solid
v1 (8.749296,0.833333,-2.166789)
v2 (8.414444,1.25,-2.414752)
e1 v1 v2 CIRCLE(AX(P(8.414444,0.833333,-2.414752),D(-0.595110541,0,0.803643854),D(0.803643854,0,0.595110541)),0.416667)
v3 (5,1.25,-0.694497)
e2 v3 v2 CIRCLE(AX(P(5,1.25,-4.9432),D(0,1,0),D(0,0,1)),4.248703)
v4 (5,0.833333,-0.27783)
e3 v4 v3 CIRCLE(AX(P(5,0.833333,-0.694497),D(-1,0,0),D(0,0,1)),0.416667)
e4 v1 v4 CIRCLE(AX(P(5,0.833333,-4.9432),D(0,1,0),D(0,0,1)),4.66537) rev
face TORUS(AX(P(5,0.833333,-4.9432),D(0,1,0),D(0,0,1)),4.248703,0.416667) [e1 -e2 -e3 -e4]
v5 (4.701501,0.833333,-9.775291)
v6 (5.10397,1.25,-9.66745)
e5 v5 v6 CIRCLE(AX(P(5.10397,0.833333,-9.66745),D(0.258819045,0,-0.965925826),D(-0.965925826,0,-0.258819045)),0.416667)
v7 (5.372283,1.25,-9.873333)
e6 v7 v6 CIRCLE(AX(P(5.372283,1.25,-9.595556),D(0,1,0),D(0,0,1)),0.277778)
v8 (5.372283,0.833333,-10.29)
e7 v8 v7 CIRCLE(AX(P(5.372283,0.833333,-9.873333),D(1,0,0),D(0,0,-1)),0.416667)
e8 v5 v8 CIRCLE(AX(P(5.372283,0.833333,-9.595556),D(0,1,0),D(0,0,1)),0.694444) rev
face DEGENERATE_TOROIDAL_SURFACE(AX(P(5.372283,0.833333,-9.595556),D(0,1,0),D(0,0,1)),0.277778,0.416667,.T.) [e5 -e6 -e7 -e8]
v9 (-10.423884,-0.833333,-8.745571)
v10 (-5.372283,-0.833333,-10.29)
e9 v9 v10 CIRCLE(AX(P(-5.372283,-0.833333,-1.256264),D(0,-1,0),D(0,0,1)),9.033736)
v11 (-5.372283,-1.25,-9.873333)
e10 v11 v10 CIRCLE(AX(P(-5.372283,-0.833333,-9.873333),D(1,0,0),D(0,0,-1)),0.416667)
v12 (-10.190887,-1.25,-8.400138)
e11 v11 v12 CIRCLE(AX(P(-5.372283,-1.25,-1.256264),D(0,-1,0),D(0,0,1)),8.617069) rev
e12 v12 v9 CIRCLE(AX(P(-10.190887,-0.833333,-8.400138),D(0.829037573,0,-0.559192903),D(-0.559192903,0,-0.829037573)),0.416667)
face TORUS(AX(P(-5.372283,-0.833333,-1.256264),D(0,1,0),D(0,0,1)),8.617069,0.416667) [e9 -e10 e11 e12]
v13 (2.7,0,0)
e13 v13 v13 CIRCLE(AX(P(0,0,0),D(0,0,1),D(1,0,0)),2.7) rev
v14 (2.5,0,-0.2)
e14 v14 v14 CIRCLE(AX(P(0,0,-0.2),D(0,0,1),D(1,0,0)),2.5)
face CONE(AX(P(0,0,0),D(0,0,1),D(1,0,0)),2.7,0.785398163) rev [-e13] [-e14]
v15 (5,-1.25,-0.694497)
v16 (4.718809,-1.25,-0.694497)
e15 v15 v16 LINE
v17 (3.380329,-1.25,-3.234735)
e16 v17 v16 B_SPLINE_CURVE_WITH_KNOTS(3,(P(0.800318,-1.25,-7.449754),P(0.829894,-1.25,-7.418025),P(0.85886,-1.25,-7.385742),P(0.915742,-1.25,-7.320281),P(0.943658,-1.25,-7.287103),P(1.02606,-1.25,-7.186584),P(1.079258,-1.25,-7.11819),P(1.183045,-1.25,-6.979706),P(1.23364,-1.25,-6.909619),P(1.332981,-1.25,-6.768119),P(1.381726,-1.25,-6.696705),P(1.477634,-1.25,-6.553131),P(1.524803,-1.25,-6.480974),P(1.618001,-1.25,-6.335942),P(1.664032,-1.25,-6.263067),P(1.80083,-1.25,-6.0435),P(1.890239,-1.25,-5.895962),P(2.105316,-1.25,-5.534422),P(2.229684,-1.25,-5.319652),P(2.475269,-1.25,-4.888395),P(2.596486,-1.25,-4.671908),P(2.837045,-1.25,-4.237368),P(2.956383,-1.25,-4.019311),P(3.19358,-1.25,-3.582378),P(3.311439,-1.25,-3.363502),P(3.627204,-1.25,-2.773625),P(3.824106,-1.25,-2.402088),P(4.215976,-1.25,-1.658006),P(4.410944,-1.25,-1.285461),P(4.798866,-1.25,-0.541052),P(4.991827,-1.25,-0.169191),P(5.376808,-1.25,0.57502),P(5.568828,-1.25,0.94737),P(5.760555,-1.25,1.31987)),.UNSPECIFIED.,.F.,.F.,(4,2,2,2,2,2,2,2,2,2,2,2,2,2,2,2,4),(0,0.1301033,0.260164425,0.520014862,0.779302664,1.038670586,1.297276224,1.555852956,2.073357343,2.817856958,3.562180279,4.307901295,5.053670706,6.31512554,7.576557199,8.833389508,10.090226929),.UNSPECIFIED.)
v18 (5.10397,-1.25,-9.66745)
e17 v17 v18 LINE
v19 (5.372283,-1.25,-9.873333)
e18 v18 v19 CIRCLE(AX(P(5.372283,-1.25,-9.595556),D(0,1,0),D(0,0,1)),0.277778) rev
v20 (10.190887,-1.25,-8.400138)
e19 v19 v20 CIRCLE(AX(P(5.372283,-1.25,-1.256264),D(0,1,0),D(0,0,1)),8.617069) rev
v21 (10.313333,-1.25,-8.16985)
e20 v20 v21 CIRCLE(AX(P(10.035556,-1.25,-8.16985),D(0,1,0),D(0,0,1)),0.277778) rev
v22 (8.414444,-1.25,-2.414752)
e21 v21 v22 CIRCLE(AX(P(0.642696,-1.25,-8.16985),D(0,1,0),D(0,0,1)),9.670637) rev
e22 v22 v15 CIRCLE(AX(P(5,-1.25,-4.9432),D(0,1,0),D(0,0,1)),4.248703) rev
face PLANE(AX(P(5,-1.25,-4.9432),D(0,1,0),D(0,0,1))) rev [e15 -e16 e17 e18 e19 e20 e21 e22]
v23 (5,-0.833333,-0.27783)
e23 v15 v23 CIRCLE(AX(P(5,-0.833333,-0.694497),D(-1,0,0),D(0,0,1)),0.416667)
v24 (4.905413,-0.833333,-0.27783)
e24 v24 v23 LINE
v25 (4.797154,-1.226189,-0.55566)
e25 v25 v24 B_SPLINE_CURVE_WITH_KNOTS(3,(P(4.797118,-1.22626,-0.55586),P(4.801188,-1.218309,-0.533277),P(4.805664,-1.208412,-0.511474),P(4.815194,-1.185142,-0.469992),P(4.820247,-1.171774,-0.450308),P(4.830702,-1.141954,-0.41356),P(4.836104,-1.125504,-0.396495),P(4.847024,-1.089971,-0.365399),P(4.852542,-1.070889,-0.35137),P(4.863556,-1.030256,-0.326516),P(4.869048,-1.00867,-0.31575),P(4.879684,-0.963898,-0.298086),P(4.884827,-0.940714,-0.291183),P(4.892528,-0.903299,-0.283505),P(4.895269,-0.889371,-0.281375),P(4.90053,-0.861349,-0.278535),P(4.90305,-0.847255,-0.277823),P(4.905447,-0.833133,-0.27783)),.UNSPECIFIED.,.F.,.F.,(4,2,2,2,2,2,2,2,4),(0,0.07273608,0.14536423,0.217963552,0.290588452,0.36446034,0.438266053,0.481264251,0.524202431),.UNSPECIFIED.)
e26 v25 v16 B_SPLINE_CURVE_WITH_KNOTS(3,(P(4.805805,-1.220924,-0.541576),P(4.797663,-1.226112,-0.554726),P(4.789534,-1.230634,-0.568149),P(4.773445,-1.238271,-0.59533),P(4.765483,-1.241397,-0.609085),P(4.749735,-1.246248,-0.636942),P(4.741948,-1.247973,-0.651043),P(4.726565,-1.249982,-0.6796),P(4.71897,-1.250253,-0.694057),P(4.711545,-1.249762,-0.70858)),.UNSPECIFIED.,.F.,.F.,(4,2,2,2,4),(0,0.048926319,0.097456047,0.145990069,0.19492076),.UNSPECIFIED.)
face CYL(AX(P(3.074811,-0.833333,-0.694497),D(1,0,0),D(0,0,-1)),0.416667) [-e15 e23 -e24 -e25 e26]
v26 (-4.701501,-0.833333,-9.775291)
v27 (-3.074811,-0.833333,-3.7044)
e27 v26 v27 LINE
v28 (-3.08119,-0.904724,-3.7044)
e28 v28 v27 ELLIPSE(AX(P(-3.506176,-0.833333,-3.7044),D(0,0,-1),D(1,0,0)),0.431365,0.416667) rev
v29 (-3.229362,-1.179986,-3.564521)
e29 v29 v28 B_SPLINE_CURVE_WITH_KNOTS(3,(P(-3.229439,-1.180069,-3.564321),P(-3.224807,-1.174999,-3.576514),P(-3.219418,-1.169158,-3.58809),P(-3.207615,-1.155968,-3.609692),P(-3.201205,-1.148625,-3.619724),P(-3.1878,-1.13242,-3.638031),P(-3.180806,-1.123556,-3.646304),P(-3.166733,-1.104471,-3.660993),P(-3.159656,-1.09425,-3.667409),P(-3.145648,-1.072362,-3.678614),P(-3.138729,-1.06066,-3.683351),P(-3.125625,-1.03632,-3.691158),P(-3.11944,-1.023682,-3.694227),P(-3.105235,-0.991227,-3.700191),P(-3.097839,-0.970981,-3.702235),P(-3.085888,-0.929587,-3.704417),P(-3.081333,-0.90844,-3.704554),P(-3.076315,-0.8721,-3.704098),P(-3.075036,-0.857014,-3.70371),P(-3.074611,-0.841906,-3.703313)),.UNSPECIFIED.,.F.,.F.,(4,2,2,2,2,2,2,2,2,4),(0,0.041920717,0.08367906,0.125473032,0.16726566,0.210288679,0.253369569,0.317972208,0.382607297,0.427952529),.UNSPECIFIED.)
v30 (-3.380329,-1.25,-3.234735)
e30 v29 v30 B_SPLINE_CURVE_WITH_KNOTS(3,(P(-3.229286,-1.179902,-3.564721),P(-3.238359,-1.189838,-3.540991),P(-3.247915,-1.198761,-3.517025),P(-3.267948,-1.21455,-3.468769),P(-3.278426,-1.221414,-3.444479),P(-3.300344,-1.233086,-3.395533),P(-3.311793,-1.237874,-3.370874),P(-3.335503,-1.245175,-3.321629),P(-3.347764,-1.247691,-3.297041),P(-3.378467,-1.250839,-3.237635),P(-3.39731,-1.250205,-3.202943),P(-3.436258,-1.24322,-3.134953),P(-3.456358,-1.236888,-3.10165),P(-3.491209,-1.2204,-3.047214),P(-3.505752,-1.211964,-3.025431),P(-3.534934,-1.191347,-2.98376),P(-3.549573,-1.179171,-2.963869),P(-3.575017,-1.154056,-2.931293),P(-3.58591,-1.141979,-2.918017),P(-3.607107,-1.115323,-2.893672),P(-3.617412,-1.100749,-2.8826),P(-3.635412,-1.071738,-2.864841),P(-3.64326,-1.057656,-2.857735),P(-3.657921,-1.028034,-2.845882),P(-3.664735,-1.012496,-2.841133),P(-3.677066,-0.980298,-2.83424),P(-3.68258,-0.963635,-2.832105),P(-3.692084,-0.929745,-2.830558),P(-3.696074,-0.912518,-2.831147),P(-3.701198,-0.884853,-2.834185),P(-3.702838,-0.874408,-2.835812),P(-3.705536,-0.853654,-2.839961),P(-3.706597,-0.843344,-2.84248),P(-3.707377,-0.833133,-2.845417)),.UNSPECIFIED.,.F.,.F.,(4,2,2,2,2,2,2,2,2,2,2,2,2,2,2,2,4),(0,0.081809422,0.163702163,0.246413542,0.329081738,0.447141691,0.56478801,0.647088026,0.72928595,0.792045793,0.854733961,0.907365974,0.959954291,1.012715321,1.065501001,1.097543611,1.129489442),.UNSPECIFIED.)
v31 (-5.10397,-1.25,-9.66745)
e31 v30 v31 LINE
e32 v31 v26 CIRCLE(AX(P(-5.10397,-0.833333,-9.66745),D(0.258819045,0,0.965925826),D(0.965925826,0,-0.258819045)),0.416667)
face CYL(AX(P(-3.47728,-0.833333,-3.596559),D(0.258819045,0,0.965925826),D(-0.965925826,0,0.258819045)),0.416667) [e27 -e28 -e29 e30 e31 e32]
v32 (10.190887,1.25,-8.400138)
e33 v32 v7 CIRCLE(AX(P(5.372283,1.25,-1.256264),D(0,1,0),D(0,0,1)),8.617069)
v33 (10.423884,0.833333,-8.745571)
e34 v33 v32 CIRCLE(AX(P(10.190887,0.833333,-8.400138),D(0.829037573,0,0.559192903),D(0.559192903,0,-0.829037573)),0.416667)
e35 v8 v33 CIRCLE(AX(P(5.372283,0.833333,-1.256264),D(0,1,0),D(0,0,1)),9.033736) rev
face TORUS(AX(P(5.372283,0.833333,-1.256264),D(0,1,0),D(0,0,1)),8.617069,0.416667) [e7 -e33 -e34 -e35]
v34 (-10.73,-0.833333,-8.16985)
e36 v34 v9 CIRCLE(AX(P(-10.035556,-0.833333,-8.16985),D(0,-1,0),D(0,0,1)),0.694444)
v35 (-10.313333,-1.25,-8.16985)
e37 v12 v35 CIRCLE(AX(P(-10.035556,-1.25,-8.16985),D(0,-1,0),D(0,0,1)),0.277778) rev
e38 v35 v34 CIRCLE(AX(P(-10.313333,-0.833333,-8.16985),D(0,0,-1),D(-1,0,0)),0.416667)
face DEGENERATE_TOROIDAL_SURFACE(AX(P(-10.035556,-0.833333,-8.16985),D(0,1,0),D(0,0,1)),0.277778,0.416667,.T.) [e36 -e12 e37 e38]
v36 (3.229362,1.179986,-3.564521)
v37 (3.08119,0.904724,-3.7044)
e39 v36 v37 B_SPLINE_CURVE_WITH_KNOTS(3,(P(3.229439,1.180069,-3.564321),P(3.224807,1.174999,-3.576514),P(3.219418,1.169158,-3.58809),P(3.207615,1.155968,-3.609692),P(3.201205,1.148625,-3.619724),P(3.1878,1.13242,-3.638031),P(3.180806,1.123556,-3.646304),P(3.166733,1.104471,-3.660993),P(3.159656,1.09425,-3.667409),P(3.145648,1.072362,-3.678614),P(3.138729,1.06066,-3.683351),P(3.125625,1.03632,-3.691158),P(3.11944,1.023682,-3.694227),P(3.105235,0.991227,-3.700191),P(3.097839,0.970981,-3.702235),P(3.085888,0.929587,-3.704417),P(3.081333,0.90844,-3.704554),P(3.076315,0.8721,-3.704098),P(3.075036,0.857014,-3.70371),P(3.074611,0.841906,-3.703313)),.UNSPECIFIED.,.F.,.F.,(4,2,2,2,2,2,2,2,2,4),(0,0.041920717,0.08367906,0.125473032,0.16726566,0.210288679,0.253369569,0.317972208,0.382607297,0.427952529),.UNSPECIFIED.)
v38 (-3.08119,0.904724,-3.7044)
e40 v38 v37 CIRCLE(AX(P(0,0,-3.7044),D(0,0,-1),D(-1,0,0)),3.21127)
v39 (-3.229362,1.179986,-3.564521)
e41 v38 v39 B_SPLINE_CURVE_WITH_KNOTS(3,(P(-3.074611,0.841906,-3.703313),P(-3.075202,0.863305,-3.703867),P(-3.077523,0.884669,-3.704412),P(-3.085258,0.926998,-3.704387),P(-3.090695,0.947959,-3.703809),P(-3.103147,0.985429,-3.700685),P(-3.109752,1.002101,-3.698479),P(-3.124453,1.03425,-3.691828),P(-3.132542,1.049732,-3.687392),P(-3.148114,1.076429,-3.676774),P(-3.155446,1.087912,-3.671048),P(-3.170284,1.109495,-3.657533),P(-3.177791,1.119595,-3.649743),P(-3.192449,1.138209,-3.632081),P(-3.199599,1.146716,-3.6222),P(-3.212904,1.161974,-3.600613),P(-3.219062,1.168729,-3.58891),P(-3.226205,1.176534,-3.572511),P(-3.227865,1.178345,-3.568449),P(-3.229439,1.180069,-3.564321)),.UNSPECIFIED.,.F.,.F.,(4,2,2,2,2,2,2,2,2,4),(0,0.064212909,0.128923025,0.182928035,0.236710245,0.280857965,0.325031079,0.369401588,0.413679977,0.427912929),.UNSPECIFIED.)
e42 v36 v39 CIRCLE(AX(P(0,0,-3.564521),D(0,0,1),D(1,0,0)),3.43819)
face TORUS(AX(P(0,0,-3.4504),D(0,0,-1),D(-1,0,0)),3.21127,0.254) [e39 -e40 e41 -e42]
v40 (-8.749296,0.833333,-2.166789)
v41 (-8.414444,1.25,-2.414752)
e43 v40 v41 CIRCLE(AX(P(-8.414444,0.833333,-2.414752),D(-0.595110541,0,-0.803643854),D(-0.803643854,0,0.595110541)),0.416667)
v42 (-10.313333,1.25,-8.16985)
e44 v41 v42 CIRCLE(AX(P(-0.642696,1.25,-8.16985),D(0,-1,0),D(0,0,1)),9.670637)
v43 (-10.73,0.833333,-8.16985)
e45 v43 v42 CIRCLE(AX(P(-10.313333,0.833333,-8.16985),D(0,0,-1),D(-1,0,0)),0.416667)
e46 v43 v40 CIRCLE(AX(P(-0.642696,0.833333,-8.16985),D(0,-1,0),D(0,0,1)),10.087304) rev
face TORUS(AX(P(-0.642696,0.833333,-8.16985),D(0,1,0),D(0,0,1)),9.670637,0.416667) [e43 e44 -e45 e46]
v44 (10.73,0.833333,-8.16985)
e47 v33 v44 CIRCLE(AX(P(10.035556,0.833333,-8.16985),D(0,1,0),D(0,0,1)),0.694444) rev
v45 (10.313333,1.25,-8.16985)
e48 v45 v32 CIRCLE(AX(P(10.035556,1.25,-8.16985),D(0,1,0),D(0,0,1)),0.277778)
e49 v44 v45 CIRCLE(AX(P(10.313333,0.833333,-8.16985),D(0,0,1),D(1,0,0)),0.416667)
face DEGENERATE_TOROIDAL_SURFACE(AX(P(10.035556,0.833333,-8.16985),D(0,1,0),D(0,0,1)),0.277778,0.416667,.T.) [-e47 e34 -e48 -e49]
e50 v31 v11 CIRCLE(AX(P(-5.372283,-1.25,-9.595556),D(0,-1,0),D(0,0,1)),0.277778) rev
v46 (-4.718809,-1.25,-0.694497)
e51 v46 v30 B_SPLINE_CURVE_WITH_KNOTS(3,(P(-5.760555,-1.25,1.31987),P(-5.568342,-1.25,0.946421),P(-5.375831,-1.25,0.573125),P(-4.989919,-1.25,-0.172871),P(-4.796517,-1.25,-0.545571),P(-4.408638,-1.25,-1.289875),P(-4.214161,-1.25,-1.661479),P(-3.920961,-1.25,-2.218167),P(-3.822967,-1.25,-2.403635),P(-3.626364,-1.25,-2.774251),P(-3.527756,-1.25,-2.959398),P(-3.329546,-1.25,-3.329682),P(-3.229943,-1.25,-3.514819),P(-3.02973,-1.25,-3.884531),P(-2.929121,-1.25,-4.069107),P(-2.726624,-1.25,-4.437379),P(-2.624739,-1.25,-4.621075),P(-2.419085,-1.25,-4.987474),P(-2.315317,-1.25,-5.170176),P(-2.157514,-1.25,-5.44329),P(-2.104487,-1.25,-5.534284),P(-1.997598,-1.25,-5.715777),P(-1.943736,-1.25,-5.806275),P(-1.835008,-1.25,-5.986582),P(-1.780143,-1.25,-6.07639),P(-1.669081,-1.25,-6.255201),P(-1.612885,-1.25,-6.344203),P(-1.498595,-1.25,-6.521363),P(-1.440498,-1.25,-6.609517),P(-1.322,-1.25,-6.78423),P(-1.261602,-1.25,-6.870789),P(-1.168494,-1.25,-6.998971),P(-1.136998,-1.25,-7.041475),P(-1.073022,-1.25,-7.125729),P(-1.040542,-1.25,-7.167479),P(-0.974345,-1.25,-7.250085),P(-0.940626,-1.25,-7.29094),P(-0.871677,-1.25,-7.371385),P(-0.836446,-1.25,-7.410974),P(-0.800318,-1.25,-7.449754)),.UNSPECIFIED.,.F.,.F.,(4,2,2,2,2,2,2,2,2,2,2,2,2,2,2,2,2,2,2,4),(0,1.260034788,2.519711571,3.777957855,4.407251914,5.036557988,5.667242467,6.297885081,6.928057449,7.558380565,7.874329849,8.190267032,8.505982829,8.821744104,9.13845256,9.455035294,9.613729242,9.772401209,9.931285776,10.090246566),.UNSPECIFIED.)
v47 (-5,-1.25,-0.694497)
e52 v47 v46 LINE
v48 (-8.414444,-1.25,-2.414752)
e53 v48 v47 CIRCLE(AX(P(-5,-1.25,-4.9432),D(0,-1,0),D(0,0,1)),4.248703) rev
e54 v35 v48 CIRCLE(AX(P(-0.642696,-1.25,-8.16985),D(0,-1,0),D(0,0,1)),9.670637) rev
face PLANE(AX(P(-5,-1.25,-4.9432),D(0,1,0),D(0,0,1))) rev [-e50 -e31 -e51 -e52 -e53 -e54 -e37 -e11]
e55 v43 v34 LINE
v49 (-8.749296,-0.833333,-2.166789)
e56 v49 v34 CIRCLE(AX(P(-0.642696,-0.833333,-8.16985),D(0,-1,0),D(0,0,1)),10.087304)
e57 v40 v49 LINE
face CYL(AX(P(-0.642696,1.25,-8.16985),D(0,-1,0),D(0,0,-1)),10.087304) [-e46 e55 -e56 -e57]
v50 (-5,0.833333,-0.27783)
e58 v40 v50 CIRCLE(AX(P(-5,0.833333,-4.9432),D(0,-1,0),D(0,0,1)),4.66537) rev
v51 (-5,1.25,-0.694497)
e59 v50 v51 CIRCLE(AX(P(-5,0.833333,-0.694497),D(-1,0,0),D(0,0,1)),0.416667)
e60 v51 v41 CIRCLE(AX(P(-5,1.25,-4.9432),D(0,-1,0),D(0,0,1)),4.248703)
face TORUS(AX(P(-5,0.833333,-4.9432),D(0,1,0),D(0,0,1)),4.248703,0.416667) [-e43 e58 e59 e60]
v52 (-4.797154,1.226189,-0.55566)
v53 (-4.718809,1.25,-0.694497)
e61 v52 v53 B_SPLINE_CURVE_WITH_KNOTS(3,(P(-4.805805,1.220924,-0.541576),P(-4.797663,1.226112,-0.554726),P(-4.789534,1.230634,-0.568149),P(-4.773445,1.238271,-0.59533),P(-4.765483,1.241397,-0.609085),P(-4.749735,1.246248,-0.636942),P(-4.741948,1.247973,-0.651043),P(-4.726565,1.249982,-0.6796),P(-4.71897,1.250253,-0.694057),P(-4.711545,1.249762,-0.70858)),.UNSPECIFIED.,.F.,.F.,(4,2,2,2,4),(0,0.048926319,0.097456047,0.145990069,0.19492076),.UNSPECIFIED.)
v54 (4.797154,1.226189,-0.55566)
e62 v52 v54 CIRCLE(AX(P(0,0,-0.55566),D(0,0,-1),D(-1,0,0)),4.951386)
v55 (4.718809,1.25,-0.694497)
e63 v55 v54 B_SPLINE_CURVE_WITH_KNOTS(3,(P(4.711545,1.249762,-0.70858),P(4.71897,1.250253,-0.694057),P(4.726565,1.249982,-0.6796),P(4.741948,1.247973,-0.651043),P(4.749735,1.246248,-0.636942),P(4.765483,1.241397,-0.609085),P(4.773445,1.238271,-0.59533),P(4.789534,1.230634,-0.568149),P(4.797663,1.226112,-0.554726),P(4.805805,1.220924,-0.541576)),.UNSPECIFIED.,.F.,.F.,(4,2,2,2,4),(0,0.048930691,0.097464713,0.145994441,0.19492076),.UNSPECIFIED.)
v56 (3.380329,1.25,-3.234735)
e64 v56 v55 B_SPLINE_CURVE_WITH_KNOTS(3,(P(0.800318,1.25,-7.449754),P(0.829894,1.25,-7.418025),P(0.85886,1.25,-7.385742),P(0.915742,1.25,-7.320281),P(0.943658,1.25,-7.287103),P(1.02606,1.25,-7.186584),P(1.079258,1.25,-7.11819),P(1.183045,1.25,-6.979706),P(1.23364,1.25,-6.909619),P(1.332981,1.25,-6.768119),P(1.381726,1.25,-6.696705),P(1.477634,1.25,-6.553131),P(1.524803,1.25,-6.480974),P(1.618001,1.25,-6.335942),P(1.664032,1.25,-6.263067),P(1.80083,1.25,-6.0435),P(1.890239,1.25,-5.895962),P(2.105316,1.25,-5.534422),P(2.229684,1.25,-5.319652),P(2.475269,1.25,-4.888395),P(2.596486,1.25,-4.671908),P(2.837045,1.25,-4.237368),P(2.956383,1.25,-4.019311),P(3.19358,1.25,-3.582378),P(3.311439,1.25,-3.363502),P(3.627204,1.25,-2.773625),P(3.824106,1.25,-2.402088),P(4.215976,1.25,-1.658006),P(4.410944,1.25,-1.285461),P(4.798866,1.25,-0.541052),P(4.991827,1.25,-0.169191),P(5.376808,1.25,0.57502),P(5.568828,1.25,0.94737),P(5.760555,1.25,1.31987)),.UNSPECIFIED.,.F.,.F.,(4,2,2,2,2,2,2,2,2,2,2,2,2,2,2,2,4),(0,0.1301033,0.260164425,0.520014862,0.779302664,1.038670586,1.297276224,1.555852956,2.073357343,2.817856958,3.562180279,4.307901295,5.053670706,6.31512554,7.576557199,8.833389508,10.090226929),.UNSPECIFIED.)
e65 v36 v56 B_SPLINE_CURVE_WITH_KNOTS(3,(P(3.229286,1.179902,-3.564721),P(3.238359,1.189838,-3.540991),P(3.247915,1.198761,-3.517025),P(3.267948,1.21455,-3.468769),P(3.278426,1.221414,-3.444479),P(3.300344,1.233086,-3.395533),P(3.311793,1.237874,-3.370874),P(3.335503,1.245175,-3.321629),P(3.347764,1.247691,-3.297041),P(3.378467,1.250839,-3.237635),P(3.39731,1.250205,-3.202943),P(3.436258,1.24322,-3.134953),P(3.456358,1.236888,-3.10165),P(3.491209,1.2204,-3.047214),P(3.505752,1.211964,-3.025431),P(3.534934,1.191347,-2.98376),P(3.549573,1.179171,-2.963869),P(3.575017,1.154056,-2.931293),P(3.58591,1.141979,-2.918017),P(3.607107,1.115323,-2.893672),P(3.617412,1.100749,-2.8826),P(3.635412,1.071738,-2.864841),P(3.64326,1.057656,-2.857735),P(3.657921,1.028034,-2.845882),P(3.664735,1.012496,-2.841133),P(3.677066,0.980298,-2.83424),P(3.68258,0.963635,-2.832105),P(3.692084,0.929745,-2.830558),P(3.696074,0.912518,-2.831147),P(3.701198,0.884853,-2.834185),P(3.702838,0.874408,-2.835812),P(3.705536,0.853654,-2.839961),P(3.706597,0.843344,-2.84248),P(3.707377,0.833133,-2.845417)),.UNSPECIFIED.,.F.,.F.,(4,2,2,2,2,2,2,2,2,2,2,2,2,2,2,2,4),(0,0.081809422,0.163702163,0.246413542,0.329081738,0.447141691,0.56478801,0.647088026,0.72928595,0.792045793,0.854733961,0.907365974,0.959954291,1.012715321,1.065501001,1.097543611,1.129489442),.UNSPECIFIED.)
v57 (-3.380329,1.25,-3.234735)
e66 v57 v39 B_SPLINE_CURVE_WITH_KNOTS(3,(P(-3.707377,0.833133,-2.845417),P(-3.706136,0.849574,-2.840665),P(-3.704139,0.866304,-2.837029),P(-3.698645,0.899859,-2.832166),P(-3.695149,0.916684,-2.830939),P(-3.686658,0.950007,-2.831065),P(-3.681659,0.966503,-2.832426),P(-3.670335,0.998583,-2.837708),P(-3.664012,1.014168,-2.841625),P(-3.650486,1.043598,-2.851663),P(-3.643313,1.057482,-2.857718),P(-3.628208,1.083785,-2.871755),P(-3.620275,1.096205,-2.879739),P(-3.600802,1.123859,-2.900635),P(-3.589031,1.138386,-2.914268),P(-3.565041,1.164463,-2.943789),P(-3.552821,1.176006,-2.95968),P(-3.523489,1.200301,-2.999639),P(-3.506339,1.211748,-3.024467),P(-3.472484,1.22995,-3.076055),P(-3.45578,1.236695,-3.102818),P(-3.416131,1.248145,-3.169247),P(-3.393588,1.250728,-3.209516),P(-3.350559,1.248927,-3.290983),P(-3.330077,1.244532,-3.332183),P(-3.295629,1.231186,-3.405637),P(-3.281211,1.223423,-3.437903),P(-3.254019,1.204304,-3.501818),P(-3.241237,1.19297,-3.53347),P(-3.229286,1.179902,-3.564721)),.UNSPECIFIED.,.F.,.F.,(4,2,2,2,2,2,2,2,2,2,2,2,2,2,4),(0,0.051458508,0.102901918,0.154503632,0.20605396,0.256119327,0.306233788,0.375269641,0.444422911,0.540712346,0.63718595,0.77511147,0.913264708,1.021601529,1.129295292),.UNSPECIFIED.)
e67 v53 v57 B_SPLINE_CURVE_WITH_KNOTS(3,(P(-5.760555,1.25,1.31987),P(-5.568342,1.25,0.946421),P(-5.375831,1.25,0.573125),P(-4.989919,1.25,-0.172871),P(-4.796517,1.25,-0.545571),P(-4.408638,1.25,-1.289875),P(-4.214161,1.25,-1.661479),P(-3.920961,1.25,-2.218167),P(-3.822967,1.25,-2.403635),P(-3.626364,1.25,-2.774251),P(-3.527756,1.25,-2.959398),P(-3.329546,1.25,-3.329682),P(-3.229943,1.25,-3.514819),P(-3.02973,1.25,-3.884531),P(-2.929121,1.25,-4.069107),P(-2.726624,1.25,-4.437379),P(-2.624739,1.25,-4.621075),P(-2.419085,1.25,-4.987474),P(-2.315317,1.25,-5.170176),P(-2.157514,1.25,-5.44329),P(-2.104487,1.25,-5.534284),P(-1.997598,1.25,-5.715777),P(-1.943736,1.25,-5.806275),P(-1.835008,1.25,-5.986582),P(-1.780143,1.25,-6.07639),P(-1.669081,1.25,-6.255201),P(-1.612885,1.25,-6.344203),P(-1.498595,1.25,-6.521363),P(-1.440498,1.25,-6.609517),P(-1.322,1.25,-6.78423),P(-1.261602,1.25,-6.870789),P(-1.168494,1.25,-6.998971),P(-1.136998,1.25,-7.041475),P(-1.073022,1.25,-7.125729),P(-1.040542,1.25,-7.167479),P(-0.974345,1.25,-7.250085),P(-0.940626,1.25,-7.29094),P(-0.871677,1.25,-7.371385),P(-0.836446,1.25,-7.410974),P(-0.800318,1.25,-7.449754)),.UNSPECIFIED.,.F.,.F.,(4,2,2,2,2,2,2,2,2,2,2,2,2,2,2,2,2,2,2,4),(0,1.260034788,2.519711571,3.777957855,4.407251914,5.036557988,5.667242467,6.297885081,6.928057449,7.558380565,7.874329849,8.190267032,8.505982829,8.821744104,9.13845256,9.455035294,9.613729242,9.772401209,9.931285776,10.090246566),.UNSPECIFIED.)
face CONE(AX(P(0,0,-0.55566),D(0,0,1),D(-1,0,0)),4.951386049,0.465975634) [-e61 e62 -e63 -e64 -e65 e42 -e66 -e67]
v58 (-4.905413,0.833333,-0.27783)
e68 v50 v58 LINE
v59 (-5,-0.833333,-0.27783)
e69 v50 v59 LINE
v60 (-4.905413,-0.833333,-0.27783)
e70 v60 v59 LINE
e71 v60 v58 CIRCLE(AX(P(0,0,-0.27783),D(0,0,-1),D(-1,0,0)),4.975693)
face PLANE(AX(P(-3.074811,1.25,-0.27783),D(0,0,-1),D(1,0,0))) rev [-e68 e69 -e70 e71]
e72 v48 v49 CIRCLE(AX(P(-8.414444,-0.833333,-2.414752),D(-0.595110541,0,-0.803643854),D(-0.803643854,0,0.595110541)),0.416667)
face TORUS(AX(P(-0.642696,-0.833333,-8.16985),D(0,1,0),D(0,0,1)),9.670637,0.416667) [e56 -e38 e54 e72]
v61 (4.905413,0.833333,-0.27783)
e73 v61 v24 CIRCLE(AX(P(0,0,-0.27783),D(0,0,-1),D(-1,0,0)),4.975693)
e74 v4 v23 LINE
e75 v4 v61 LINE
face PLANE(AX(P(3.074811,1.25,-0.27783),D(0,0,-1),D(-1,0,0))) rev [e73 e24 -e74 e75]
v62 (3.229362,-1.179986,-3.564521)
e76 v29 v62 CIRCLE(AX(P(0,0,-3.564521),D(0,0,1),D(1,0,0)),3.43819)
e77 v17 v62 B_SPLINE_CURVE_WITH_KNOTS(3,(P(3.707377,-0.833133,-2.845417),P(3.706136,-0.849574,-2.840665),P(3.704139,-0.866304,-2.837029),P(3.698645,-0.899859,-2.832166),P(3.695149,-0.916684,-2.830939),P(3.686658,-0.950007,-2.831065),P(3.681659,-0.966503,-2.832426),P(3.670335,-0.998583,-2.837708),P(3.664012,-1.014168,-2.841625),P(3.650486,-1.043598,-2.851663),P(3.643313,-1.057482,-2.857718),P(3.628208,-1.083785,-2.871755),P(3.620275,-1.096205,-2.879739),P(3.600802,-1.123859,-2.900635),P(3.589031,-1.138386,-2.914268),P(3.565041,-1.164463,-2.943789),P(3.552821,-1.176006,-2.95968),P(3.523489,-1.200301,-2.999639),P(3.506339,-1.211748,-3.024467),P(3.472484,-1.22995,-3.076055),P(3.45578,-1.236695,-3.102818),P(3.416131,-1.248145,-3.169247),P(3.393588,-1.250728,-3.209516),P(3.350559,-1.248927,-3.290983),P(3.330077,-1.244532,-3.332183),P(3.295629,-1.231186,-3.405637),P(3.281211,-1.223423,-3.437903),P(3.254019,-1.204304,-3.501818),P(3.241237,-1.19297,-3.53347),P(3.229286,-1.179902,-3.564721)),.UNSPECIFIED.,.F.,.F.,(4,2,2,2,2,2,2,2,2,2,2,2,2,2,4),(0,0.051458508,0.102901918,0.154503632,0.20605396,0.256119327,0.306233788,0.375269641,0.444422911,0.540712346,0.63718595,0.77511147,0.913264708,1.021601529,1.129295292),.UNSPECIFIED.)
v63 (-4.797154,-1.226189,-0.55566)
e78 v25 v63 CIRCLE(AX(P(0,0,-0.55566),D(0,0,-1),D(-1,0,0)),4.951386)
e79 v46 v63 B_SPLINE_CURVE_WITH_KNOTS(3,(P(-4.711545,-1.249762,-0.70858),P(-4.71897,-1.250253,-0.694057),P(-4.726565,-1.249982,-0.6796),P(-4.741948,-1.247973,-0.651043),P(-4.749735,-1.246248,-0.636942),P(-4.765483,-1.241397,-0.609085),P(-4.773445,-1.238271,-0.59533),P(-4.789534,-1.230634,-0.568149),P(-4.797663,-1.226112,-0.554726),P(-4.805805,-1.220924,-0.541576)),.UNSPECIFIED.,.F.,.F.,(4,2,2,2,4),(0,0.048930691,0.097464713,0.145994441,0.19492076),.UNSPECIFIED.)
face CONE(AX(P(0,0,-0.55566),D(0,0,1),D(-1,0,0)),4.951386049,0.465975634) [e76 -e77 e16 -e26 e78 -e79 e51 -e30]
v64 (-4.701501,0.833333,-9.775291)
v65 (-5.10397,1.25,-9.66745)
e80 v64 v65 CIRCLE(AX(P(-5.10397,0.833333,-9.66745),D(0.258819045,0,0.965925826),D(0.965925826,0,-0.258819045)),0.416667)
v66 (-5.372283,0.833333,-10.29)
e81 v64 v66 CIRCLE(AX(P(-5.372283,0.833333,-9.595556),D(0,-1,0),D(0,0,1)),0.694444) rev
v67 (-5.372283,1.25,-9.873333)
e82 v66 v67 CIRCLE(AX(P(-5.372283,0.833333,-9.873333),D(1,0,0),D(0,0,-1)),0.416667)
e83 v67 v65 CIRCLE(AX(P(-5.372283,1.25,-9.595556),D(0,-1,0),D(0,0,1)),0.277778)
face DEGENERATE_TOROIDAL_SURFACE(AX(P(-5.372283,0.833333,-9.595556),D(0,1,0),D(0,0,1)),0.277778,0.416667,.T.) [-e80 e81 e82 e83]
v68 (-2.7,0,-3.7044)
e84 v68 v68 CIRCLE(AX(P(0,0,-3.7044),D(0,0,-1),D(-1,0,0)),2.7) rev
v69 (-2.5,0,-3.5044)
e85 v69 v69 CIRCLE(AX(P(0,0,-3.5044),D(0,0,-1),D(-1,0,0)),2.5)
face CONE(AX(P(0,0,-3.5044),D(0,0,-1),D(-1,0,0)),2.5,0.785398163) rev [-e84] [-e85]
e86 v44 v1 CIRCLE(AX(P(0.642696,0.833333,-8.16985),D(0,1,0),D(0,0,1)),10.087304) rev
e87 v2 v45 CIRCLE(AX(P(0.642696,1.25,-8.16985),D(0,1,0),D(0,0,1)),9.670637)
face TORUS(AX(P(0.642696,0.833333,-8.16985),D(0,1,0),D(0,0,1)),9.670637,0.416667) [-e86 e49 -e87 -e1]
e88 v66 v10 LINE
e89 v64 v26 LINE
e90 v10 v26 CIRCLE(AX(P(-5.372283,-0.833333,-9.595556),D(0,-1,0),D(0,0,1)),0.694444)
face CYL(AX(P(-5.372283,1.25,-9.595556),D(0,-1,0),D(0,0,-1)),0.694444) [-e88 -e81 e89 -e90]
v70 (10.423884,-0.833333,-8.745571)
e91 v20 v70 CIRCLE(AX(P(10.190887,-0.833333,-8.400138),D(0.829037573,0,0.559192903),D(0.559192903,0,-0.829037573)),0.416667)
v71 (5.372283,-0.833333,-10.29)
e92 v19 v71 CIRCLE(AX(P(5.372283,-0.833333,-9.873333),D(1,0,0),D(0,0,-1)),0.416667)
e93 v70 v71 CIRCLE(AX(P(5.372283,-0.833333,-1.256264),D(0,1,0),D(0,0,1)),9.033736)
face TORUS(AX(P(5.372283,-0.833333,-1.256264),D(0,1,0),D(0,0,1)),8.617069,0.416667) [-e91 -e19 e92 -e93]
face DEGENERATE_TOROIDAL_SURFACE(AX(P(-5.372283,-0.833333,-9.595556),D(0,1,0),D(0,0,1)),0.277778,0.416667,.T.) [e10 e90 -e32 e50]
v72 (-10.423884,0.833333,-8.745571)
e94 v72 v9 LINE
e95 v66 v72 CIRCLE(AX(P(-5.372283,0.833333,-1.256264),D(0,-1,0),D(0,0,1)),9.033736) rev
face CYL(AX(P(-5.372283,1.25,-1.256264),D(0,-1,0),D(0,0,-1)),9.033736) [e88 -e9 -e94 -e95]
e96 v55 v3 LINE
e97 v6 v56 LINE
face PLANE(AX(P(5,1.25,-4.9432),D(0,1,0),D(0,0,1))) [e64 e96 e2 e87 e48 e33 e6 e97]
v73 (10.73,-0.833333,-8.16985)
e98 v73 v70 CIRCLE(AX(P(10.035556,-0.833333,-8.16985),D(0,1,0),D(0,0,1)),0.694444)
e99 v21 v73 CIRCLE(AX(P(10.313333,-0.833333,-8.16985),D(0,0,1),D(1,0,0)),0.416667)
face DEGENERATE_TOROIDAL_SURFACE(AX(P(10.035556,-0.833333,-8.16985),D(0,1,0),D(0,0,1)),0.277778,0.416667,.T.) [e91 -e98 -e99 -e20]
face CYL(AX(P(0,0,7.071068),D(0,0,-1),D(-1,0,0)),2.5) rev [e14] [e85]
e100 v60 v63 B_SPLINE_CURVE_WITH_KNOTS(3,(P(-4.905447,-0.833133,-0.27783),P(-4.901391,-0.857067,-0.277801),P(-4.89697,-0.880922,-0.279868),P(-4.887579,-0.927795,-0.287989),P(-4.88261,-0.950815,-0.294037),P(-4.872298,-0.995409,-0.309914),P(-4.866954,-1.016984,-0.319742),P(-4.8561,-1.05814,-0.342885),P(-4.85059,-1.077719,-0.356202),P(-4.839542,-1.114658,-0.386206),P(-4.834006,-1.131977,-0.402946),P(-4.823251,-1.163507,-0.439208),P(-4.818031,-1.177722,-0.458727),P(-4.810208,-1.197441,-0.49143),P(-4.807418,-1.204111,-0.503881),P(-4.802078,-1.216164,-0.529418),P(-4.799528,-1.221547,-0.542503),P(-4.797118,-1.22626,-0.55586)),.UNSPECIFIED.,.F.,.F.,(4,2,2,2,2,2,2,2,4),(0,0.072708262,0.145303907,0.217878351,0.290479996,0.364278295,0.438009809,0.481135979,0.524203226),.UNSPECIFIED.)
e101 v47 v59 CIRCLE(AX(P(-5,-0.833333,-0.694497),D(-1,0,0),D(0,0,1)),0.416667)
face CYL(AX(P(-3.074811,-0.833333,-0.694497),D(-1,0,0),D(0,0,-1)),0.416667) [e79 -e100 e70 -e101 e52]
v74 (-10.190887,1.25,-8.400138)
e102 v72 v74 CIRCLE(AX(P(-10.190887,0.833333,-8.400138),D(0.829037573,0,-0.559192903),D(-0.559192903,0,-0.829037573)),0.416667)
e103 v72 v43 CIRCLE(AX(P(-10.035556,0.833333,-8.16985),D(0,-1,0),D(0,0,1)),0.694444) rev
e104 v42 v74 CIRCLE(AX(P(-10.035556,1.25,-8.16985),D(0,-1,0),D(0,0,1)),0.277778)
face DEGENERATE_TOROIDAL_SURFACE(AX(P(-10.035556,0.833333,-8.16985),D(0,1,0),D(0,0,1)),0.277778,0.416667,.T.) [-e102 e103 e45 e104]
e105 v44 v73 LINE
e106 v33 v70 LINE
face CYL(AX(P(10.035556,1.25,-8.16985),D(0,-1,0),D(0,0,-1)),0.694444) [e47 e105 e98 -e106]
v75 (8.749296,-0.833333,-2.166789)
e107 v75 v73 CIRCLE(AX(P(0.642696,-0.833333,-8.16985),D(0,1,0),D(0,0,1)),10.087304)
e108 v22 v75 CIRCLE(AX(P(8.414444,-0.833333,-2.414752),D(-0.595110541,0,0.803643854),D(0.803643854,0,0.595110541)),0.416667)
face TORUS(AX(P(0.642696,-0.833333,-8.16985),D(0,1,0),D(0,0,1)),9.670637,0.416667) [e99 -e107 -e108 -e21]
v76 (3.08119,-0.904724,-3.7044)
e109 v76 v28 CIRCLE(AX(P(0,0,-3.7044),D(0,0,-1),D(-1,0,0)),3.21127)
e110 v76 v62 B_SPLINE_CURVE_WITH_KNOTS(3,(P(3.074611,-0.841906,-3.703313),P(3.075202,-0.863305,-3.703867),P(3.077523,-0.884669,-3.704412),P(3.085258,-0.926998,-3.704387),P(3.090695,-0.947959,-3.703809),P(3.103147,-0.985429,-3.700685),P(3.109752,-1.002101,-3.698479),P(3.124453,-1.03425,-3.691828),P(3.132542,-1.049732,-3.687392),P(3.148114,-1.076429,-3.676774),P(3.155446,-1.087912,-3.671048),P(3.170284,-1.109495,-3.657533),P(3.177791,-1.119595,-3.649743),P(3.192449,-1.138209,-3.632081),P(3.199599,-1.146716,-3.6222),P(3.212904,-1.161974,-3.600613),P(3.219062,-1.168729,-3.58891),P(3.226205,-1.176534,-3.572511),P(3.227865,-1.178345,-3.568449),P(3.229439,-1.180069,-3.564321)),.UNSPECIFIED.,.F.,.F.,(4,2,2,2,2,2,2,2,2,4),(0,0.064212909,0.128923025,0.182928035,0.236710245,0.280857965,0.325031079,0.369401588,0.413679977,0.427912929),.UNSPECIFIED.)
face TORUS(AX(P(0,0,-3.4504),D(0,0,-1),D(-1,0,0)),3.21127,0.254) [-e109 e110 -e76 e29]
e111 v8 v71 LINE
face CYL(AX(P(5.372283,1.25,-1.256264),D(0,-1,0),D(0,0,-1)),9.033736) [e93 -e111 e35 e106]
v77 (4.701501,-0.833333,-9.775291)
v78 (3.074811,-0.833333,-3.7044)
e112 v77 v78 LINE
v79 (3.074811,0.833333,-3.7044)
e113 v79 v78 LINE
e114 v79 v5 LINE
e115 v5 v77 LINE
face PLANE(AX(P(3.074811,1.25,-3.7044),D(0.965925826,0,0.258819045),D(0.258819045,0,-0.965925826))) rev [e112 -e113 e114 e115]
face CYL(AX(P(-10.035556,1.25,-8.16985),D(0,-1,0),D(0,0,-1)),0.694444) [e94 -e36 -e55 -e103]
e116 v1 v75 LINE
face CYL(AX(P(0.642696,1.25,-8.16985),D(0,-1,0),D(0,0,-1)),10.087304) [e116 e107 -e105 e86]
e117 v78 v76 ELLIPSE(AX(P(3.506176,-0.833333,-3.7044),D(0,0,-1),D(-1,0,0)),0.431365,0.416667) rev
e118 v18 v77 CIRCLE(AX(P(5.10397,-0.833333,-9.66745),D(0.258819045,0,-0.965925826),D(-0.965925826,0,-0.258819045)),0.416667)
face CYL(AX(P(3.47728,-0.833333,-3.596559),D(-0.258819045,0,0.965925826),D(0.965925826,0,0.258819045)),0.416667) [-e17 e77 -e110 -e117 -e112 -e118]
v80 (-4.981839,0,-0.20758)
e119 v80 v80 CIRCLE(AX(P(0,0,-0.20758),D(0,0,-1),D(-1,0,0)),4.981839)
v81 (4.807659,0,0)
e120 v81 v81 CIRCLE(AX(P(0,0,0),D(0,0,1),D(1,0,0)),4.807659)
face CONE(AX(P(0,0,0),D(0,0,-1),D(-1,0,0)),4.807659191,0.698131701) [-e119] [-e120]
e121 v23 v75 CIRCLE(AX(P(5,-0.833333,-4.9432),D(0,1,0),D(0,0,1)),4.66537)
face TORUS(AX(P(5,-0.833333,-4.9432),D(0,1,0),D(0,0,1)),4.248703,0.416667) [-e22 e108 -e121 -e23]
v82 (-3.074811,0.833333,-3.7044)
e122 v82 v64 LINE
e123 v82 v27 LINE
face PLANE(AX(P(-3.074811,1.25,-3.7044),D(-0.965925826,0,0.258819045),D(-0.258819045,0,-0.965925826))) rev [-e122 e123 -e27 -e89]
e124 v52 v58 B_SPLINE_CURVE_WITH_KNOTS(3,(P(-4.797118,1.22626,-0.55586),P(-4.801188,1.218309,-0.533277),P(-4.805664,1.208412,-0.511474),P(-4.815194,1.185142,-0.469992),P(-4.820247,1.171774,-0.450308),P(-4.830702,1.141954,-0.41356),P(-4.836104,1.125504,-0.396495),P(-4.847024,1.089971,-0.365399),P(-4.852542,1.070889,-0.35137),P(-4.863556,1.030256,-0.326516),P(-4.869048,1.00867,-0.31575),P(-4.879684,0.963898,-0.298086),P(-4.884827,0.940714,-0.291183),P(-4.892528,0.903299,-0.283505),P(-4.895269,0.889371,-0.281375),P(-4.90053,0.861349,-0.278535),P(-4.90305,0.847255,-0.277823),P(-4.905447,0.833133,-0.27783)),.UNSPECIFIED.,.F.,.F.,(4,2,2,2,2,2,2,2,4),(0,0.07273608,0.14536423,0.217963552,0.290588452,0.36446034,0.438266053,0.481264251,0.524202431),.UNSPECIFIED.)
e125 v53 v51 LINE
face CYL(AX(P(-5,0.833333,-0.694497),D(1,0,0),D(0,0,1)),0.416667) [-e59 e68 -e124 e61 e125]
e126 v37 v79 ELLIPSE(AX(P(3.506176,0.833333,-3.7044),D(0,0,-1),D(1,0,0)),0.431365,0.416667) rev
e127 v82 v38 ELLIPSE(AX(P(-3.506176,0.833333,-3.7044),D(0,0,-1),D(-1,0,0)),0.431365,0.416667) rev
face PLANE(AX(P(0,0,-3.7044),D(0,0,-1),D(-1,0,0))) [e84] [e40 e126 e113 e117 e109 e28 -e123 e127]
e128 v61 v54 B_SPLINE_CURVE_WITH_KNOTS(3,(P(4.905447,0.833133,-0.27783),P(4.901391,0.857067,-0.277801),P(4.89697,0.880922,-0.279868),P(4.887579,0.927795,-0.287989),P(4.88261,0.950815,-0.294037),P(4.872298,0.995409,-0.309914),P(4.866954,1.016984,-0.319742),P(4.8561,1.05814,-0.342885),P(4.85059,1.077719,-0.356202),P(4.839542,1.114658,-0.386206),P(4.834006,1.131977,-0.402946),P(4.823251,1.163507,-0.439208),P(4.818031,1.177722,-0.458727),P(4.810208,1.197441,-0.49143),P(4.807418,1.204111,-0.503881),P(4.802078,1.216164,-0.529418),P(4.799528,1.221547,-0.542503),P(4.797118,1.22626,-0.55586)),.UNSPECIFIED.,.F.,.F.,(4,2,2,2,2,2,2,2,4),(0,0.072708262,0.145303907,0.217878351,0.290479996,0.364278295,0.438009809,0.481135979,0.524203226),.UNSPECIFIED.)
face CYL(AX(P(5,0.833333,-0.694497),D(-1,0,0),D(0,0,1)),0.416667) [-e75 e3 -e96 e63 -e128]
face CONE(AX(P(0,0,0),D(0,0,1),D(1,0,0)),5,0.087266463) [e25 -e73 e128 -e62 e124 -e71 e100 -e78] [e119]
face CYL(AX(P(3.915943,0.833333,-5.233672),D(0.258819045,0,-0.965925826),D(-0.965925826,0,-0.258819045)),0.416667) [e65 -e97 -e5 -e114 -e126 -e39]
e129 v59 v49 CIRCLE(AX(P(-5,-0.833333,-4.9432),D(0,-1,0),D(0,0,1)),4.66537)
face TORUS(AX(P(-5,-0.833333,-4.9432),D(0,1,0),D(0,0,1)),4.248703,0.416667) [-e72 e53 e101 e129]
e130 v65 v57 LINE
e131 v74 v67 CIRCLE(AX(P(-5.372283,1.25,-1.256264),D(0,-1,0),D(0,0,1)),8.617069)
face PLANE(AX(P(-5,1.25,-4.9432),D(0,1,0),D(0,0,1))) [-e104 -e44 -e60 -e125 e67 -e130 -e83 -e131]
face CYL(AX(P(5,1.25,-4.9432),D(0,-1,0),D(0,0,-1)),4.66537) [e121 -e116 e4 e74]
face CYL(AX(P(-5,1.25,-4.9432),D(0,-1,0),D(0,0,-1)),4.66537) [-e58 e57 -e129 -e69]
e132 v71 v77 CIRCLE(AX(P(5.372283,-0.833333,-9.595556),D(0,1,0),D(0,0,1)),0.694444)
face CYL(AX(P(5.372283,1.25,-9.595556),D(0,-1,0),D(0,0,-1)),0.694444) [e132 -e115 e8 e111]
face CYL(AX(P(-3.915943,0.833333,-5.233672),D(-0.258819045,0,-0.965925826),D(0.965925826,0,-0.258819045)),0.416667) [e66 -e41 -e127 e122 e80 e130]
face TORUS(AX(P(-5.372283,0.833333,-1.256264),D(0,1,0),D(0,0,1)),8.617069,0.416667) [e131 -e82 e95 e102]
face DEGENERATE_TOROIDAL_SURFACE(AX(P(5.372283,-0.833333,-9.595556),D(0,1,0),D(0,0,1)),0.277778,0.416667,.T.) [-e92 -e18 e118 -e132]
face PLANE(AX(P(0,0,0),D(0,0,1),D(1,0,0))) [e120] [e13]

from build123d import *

# Parameters (mm, degrees)
EXTRUDE2_DEPTH      = 1.25
SKETCH3_R           = 5
EXTRUDE1_DEPTH      = 0.55566
EXTRUDE1_DRAFT      = -5
SKETCH15_R          = 4.951386049
EXTRUDE3_DEPTH      = 3.14874
EXTRUDE3_TAPER      = 26.698437176
FILLET3_R           = 0.254
SKETCH4_R           = 2.5
CUT_EXTRUDE1_DEPTH  = 16.684929072
SWEEP1_PITCH        = 0.8
SKETCH7_R           = 5
CUT_EXTRUDE2_DEPTH  = 16.684929104
SKETCH8_R           = 4.951386049
CUT_EXTRUDE3_DEPTH  = 14.546328962
SKETCH11_R          = 2.4492
CUT_EXTRUDE5_DEPTH  = 14.546328926
CUT_EXTRUDE5_TAPER  = 45
CHAMFER1_SIZE       = 0.2083725
CHAMFER1_SIZE2      = 0.192340809
FILLET4_R           = 0.416666667
SKETCH18_R          = 3.211270087
BOSS_EXTRUDE3_DEPTH = 3.7044
SKETCH19_R          = 2.5
CUT_EXTRUDE6_DEPTH  = 3.7044
CHAMFER2_SIZE       = 0.2


with BuildPart() as part:
    # Sketch13 → Extrude2 (new, symmetric)
    with BuildSketch(Plane(origin=(0, 0, 0), x_dir=(1, 0, 0), z_dir=(0, 1, 0))):
        with BuildLine():
            Line((3.074810737, 0.27783), (5, 0.27783))
            ThreePointArc((5, 0.27783), (7.099129938, 0.776746992), (8.749295866, 2.166789103))
            ThreePointArc((8.749295866, 2.166789103), (10.222034162, 5.009156698), (10.73, 8.169850029))
            ThreePointArc((10.73, 8.169850029), (10.648713606, 8.495871948), (10.423883961, 8.745570566))
            ThreePointArc((10.423883961, 8.745570566), (8.013491694, 9.895268701), (5.372282902, 10.29))
            ThreePointArc((5.372282902, 10.29), (4.94953191, 10.146495375), (4.701501078, 9.775291004))
            Line((4.701501078, 9.775291004), (3.074810737, 3.7044))
            Line((3.074810737, 3.7044), (3.074810737, 0.27783))
        make_face()
    extrude(amount=EXTRUDE2_DEPTH, both=True)

    # Fillet4
    fillet4_edges = [part.edges().sort_by_distance(p)[0] for p in [
        (7.099129938, 1.25, -0.776746992),
        (10.222034162, 1.25, -5.009156698),
        (10.648713606, 1.25, -8.495871948),
        (8.013491694, 1.25, -9.895268701),
        (4.94953191, 1.25, -10.146495375),
        (3.888155907, 1.25, -6.739845502),
        (3.888155907, -1.25, -6.739845502),
        (4.037405368, 1.25, -0.27783),
        (4.94953191, -1.25, -10.146495375),
        (8.013491694, -1.25, -9.895268701),
        (10.648713606, -1.25, -8.495871948),
        (10.222034162, -1.25, -5.009156698),
        (7.099129938, -1.25, -0.776746992),
        (4.037405368, -1.25, -0.27783),
    ]]
    fillet(fillet4_edges, radius=FILLET4_R)


with BuildPart() as body_2:
    # Sketch3 → Extrude1 (with draft: the straight prism first)
    with BuildSketch(Plane.XY):
        Circle(SKETCH3_R)
    extrude(amount=-EXTRUDE1_DEPTH)
    # Extrude1: the draft: its side faces are tilted about the plane it starts from
    extrude1_sides = [body_2.faces().sort_by_distance(p)[0] for p in [
        (-5, 0, -0.27783),
    ]]
    draft(extrude1_sides, Plane.XY, EXTRUDE1_DRAFT)

    # Sketch15 → Extrude3 (add)
    with BuildSketch(Plane(origin=(0, 0, -0.55566), x_dir=(-1, 0, 0), z_dir=(0, 0, -1))):
        Circle(SKETCH15_R)
    extrude(amount=EXTRUDE3_DEPTH, taper=EXTRUDE3_TAPER)

    # Fillet3
    fillet3_edges = [body_2.edges().sort_by_distance(p)[0] for p in [
        (3.367842423, 0, -3.7044),
    ]]
    fillet(fillet3_edges, radius=FILLET3_R)

    # Sketch4 → Cut-Extrude1 (cut, through all)
    with BuildSketch(Plane.XY):
        Circle(SKETCH4_R)
    extrude(amount=-CUT_EXTRUDE1_DEPTH, mode=Mode.SUBTRACT)

    # Sweep1: the profile of Sketch6 profile screwed along a right-hand helix of 7.1305 turns, 6 arcs to a turn; built about Z, then put on its axis
    sweep1_z = Axis((0, 0, 0), (0, 0, 1))
    sweep1_corners = [(2.5003, 0, -0.700173205), (1.980384758, 0, -0.4), (1.980384758, 0, -0.3), (2.5003, 0, 0.000173205)]
    with BuildLine(mode=Mode.PRIVATE) as sweep1_profile:
        Line(sweep1_corners[0], sweep1_corners[1])
        Line(sweep1_corners[1], sweep1_corners[2])
        Line(sweep1_corners[2], sweep1_corners[3])
        Line(sweep1_corners[3], sweep1_corners[0])
    sweep1_cap = Face(sweep1_profile.wire())
    sweep1_turn_angles = [0, 30, 60, 90, 120, 150, 180, 210, 240, 270, 300, 330, 360]
    sweep1_turn_weights = [1, 0.8660254037844387, 1, 0.8660254037844387, 1, 0.8660254037844387, 1, 0.8660254037844387, 1, 0.8660254037844387, 1, 0.8660254037844387, 1]
    sweep1_turn_rails = [Edge.make_bspline([Vector(p[0], p[1], 0).rotate(sweep1_z, sweep1_turn_angles[k]) / sweep1_turn_weights[k] + Vector(0, 0, p[2] + SWEEP1_PITCH * sweep1_turn_angles[k] / 360) for k in range(13)], [0, 0, 0, 1, 1, 2, 2, 3, 3, 4, 4, 5, 5, 6, 6, 6], 2, sweep1_turn_weights) for p in sweep1_corners]
    sweep1_turn_sides = [Face.make_surface_from_curves(sweep1_turn_rails[p[0]], sweep1_turn_rails[p[1]]) for p in [(0, 1), (1, 2), (2, 3), (3, 0)]]
    sweep1_last_angles = [2520, 2543.49, 2566.98]
    sweep1_last_weights = [1, 0.9171296552585544, 1]
    sweep1_last_rails = [Edge.make_bspline([Vector(p[0], p[1], 0).rotate(sweep1_z, sweep1_last_angles[k]) / sweep1_last_weights[k] + Vector(0, 0, p[2] + SWEEP1_PITCH * sweep1_last_angles[k] / 360) for k in range(3)], [0, 0, 0, 1, 1, 1], 2, sweep1_last_weights) for p in sweep1_corners]
    sweep1_last_sides = [Face.make_surface_from_curves(sweep1_last_rails[p[0]], sweep1_last_rails[p[1]]) for p in [(0, 1), (1, 2), (2, 3), (3, 0)]]
    sweep1 = Plane(origin=(0, 0, 0), x_dir=(-1, 0, 0), z_dir=(0, 0, -1)) * Solid(Shell([*[p.moved(Location((0, 0, SWEEP1_PITCH * i))) for i in range(7) for p in sweep1_turn_sides], *sweep1_last_sides, sweep1_cap, sweep1_cap.rotate(sweep1_z, 2566.98).moved(Location((0, 0, SWEEP1_PITCH * 2566.98 / 360)))]))
    add(sweep1)

    # Sketch7 → Cut-Extrude2 (cut, through all)
    with BuildSketch(Plane.XY):
        Circle(SKETCH7_R)
    extrude(amount=CUT_EXTRUDE2_DEPTH, mode=Mode.SUBTRACT)

    # Sketch8 → Cut-Extrude3 (cut, through all)
    with BuildSketch(Plane.XY.offset(-3.7044)):
        Circle(SKETCH8_R)
    extrude(amount=-CUT_EXTRUDE3_DEPTH, mode=Mode.SUBTRACT)

    # Cut-Extrude4 cone 1 section (through the dimple's axis) → Cut-Extrude4 (revolve, cut)
    with BuildSketch(Plane(origin=(0, 0, 0), x_dir=(0, -1, 0), z_dir=(1, 0, 0))):
        Polygon((0, 0), (2.5, 0), (0, 2.5), align=None)
    revolve(axis=Axis((0, 0, 0), (0, 0, -1)), mode=Mode.SUBTRACT)

    # Sketch11 → Cut-Extrude5 (cut, through all)
    with BuildSketch(Plane.XY.offset(-3.7044)):
        Circle(SKETCH11_R)
    extrude(amount=CUT_EXTRUDE5_DEPTH, taper=CUT_EXTRUDE5_TAPER, mode=Mode.SUBTRACT)

    # Chamfer1
    chamfer1_edges = [body_2.edges().sort_by_distance(p)[0] for p in [
        (-5, 0, 0),
    ]]
    chamfer1_side = [body_2.faces().sort_by_distance(p)[0] for p in [
        (-4.975693025, 0, -0.27783),
    ]]
    chamfer(chamfer1_edges, length=CHAMFER1_SIZE, length2=CHAMFER1_SIZE2, reference=chamfer1_side[0])


with BuildPart() as body_3:
    # Mirror6: mirrored copy
    add(part.part.mirror(Plane(origin=(0, 0, 0), x_dir=(0, 0, 1), z_dir=(1, 0, 0))))

    # Combine2: union part, body 2
    add(part.part)
    add(body_2.part)

    # Sketch18 → Boss-Extrude3 (add)
    with BuildSketch(Plane(origin=(0, 0, -3.7044), x_dir=(-1, 0, 0), z_dir=(0, 0, -1))):
        Circle(SKETCH18_R)
    extrude(amount=-BOSS_EXTRUDE3_DEPTH)

    # Sketch19 → Cut-Extrude6 (cut)
    with BuildSketch(Plane(origin=(0, 0, -3.7044), x_dir=(-1, 0, 0), z_dir=(0, 0, -1))):
        Circle(SKETCH19_R)
    extrude(amount=-CUT_EXTRUDE6_DEPTH, mode=Mode.SUBTRACT)

    # Chamfer2
    chamfer2_edges = [body_3.edges().sort_by_distance(p)[0] for p in [
        (2.5, 0, -3.7044),
        (2.5, 0, 0),
    ]]
    chamfer(chamfer2_edges, length=CHAMFER2_SIZE)


solid = body_3.part
